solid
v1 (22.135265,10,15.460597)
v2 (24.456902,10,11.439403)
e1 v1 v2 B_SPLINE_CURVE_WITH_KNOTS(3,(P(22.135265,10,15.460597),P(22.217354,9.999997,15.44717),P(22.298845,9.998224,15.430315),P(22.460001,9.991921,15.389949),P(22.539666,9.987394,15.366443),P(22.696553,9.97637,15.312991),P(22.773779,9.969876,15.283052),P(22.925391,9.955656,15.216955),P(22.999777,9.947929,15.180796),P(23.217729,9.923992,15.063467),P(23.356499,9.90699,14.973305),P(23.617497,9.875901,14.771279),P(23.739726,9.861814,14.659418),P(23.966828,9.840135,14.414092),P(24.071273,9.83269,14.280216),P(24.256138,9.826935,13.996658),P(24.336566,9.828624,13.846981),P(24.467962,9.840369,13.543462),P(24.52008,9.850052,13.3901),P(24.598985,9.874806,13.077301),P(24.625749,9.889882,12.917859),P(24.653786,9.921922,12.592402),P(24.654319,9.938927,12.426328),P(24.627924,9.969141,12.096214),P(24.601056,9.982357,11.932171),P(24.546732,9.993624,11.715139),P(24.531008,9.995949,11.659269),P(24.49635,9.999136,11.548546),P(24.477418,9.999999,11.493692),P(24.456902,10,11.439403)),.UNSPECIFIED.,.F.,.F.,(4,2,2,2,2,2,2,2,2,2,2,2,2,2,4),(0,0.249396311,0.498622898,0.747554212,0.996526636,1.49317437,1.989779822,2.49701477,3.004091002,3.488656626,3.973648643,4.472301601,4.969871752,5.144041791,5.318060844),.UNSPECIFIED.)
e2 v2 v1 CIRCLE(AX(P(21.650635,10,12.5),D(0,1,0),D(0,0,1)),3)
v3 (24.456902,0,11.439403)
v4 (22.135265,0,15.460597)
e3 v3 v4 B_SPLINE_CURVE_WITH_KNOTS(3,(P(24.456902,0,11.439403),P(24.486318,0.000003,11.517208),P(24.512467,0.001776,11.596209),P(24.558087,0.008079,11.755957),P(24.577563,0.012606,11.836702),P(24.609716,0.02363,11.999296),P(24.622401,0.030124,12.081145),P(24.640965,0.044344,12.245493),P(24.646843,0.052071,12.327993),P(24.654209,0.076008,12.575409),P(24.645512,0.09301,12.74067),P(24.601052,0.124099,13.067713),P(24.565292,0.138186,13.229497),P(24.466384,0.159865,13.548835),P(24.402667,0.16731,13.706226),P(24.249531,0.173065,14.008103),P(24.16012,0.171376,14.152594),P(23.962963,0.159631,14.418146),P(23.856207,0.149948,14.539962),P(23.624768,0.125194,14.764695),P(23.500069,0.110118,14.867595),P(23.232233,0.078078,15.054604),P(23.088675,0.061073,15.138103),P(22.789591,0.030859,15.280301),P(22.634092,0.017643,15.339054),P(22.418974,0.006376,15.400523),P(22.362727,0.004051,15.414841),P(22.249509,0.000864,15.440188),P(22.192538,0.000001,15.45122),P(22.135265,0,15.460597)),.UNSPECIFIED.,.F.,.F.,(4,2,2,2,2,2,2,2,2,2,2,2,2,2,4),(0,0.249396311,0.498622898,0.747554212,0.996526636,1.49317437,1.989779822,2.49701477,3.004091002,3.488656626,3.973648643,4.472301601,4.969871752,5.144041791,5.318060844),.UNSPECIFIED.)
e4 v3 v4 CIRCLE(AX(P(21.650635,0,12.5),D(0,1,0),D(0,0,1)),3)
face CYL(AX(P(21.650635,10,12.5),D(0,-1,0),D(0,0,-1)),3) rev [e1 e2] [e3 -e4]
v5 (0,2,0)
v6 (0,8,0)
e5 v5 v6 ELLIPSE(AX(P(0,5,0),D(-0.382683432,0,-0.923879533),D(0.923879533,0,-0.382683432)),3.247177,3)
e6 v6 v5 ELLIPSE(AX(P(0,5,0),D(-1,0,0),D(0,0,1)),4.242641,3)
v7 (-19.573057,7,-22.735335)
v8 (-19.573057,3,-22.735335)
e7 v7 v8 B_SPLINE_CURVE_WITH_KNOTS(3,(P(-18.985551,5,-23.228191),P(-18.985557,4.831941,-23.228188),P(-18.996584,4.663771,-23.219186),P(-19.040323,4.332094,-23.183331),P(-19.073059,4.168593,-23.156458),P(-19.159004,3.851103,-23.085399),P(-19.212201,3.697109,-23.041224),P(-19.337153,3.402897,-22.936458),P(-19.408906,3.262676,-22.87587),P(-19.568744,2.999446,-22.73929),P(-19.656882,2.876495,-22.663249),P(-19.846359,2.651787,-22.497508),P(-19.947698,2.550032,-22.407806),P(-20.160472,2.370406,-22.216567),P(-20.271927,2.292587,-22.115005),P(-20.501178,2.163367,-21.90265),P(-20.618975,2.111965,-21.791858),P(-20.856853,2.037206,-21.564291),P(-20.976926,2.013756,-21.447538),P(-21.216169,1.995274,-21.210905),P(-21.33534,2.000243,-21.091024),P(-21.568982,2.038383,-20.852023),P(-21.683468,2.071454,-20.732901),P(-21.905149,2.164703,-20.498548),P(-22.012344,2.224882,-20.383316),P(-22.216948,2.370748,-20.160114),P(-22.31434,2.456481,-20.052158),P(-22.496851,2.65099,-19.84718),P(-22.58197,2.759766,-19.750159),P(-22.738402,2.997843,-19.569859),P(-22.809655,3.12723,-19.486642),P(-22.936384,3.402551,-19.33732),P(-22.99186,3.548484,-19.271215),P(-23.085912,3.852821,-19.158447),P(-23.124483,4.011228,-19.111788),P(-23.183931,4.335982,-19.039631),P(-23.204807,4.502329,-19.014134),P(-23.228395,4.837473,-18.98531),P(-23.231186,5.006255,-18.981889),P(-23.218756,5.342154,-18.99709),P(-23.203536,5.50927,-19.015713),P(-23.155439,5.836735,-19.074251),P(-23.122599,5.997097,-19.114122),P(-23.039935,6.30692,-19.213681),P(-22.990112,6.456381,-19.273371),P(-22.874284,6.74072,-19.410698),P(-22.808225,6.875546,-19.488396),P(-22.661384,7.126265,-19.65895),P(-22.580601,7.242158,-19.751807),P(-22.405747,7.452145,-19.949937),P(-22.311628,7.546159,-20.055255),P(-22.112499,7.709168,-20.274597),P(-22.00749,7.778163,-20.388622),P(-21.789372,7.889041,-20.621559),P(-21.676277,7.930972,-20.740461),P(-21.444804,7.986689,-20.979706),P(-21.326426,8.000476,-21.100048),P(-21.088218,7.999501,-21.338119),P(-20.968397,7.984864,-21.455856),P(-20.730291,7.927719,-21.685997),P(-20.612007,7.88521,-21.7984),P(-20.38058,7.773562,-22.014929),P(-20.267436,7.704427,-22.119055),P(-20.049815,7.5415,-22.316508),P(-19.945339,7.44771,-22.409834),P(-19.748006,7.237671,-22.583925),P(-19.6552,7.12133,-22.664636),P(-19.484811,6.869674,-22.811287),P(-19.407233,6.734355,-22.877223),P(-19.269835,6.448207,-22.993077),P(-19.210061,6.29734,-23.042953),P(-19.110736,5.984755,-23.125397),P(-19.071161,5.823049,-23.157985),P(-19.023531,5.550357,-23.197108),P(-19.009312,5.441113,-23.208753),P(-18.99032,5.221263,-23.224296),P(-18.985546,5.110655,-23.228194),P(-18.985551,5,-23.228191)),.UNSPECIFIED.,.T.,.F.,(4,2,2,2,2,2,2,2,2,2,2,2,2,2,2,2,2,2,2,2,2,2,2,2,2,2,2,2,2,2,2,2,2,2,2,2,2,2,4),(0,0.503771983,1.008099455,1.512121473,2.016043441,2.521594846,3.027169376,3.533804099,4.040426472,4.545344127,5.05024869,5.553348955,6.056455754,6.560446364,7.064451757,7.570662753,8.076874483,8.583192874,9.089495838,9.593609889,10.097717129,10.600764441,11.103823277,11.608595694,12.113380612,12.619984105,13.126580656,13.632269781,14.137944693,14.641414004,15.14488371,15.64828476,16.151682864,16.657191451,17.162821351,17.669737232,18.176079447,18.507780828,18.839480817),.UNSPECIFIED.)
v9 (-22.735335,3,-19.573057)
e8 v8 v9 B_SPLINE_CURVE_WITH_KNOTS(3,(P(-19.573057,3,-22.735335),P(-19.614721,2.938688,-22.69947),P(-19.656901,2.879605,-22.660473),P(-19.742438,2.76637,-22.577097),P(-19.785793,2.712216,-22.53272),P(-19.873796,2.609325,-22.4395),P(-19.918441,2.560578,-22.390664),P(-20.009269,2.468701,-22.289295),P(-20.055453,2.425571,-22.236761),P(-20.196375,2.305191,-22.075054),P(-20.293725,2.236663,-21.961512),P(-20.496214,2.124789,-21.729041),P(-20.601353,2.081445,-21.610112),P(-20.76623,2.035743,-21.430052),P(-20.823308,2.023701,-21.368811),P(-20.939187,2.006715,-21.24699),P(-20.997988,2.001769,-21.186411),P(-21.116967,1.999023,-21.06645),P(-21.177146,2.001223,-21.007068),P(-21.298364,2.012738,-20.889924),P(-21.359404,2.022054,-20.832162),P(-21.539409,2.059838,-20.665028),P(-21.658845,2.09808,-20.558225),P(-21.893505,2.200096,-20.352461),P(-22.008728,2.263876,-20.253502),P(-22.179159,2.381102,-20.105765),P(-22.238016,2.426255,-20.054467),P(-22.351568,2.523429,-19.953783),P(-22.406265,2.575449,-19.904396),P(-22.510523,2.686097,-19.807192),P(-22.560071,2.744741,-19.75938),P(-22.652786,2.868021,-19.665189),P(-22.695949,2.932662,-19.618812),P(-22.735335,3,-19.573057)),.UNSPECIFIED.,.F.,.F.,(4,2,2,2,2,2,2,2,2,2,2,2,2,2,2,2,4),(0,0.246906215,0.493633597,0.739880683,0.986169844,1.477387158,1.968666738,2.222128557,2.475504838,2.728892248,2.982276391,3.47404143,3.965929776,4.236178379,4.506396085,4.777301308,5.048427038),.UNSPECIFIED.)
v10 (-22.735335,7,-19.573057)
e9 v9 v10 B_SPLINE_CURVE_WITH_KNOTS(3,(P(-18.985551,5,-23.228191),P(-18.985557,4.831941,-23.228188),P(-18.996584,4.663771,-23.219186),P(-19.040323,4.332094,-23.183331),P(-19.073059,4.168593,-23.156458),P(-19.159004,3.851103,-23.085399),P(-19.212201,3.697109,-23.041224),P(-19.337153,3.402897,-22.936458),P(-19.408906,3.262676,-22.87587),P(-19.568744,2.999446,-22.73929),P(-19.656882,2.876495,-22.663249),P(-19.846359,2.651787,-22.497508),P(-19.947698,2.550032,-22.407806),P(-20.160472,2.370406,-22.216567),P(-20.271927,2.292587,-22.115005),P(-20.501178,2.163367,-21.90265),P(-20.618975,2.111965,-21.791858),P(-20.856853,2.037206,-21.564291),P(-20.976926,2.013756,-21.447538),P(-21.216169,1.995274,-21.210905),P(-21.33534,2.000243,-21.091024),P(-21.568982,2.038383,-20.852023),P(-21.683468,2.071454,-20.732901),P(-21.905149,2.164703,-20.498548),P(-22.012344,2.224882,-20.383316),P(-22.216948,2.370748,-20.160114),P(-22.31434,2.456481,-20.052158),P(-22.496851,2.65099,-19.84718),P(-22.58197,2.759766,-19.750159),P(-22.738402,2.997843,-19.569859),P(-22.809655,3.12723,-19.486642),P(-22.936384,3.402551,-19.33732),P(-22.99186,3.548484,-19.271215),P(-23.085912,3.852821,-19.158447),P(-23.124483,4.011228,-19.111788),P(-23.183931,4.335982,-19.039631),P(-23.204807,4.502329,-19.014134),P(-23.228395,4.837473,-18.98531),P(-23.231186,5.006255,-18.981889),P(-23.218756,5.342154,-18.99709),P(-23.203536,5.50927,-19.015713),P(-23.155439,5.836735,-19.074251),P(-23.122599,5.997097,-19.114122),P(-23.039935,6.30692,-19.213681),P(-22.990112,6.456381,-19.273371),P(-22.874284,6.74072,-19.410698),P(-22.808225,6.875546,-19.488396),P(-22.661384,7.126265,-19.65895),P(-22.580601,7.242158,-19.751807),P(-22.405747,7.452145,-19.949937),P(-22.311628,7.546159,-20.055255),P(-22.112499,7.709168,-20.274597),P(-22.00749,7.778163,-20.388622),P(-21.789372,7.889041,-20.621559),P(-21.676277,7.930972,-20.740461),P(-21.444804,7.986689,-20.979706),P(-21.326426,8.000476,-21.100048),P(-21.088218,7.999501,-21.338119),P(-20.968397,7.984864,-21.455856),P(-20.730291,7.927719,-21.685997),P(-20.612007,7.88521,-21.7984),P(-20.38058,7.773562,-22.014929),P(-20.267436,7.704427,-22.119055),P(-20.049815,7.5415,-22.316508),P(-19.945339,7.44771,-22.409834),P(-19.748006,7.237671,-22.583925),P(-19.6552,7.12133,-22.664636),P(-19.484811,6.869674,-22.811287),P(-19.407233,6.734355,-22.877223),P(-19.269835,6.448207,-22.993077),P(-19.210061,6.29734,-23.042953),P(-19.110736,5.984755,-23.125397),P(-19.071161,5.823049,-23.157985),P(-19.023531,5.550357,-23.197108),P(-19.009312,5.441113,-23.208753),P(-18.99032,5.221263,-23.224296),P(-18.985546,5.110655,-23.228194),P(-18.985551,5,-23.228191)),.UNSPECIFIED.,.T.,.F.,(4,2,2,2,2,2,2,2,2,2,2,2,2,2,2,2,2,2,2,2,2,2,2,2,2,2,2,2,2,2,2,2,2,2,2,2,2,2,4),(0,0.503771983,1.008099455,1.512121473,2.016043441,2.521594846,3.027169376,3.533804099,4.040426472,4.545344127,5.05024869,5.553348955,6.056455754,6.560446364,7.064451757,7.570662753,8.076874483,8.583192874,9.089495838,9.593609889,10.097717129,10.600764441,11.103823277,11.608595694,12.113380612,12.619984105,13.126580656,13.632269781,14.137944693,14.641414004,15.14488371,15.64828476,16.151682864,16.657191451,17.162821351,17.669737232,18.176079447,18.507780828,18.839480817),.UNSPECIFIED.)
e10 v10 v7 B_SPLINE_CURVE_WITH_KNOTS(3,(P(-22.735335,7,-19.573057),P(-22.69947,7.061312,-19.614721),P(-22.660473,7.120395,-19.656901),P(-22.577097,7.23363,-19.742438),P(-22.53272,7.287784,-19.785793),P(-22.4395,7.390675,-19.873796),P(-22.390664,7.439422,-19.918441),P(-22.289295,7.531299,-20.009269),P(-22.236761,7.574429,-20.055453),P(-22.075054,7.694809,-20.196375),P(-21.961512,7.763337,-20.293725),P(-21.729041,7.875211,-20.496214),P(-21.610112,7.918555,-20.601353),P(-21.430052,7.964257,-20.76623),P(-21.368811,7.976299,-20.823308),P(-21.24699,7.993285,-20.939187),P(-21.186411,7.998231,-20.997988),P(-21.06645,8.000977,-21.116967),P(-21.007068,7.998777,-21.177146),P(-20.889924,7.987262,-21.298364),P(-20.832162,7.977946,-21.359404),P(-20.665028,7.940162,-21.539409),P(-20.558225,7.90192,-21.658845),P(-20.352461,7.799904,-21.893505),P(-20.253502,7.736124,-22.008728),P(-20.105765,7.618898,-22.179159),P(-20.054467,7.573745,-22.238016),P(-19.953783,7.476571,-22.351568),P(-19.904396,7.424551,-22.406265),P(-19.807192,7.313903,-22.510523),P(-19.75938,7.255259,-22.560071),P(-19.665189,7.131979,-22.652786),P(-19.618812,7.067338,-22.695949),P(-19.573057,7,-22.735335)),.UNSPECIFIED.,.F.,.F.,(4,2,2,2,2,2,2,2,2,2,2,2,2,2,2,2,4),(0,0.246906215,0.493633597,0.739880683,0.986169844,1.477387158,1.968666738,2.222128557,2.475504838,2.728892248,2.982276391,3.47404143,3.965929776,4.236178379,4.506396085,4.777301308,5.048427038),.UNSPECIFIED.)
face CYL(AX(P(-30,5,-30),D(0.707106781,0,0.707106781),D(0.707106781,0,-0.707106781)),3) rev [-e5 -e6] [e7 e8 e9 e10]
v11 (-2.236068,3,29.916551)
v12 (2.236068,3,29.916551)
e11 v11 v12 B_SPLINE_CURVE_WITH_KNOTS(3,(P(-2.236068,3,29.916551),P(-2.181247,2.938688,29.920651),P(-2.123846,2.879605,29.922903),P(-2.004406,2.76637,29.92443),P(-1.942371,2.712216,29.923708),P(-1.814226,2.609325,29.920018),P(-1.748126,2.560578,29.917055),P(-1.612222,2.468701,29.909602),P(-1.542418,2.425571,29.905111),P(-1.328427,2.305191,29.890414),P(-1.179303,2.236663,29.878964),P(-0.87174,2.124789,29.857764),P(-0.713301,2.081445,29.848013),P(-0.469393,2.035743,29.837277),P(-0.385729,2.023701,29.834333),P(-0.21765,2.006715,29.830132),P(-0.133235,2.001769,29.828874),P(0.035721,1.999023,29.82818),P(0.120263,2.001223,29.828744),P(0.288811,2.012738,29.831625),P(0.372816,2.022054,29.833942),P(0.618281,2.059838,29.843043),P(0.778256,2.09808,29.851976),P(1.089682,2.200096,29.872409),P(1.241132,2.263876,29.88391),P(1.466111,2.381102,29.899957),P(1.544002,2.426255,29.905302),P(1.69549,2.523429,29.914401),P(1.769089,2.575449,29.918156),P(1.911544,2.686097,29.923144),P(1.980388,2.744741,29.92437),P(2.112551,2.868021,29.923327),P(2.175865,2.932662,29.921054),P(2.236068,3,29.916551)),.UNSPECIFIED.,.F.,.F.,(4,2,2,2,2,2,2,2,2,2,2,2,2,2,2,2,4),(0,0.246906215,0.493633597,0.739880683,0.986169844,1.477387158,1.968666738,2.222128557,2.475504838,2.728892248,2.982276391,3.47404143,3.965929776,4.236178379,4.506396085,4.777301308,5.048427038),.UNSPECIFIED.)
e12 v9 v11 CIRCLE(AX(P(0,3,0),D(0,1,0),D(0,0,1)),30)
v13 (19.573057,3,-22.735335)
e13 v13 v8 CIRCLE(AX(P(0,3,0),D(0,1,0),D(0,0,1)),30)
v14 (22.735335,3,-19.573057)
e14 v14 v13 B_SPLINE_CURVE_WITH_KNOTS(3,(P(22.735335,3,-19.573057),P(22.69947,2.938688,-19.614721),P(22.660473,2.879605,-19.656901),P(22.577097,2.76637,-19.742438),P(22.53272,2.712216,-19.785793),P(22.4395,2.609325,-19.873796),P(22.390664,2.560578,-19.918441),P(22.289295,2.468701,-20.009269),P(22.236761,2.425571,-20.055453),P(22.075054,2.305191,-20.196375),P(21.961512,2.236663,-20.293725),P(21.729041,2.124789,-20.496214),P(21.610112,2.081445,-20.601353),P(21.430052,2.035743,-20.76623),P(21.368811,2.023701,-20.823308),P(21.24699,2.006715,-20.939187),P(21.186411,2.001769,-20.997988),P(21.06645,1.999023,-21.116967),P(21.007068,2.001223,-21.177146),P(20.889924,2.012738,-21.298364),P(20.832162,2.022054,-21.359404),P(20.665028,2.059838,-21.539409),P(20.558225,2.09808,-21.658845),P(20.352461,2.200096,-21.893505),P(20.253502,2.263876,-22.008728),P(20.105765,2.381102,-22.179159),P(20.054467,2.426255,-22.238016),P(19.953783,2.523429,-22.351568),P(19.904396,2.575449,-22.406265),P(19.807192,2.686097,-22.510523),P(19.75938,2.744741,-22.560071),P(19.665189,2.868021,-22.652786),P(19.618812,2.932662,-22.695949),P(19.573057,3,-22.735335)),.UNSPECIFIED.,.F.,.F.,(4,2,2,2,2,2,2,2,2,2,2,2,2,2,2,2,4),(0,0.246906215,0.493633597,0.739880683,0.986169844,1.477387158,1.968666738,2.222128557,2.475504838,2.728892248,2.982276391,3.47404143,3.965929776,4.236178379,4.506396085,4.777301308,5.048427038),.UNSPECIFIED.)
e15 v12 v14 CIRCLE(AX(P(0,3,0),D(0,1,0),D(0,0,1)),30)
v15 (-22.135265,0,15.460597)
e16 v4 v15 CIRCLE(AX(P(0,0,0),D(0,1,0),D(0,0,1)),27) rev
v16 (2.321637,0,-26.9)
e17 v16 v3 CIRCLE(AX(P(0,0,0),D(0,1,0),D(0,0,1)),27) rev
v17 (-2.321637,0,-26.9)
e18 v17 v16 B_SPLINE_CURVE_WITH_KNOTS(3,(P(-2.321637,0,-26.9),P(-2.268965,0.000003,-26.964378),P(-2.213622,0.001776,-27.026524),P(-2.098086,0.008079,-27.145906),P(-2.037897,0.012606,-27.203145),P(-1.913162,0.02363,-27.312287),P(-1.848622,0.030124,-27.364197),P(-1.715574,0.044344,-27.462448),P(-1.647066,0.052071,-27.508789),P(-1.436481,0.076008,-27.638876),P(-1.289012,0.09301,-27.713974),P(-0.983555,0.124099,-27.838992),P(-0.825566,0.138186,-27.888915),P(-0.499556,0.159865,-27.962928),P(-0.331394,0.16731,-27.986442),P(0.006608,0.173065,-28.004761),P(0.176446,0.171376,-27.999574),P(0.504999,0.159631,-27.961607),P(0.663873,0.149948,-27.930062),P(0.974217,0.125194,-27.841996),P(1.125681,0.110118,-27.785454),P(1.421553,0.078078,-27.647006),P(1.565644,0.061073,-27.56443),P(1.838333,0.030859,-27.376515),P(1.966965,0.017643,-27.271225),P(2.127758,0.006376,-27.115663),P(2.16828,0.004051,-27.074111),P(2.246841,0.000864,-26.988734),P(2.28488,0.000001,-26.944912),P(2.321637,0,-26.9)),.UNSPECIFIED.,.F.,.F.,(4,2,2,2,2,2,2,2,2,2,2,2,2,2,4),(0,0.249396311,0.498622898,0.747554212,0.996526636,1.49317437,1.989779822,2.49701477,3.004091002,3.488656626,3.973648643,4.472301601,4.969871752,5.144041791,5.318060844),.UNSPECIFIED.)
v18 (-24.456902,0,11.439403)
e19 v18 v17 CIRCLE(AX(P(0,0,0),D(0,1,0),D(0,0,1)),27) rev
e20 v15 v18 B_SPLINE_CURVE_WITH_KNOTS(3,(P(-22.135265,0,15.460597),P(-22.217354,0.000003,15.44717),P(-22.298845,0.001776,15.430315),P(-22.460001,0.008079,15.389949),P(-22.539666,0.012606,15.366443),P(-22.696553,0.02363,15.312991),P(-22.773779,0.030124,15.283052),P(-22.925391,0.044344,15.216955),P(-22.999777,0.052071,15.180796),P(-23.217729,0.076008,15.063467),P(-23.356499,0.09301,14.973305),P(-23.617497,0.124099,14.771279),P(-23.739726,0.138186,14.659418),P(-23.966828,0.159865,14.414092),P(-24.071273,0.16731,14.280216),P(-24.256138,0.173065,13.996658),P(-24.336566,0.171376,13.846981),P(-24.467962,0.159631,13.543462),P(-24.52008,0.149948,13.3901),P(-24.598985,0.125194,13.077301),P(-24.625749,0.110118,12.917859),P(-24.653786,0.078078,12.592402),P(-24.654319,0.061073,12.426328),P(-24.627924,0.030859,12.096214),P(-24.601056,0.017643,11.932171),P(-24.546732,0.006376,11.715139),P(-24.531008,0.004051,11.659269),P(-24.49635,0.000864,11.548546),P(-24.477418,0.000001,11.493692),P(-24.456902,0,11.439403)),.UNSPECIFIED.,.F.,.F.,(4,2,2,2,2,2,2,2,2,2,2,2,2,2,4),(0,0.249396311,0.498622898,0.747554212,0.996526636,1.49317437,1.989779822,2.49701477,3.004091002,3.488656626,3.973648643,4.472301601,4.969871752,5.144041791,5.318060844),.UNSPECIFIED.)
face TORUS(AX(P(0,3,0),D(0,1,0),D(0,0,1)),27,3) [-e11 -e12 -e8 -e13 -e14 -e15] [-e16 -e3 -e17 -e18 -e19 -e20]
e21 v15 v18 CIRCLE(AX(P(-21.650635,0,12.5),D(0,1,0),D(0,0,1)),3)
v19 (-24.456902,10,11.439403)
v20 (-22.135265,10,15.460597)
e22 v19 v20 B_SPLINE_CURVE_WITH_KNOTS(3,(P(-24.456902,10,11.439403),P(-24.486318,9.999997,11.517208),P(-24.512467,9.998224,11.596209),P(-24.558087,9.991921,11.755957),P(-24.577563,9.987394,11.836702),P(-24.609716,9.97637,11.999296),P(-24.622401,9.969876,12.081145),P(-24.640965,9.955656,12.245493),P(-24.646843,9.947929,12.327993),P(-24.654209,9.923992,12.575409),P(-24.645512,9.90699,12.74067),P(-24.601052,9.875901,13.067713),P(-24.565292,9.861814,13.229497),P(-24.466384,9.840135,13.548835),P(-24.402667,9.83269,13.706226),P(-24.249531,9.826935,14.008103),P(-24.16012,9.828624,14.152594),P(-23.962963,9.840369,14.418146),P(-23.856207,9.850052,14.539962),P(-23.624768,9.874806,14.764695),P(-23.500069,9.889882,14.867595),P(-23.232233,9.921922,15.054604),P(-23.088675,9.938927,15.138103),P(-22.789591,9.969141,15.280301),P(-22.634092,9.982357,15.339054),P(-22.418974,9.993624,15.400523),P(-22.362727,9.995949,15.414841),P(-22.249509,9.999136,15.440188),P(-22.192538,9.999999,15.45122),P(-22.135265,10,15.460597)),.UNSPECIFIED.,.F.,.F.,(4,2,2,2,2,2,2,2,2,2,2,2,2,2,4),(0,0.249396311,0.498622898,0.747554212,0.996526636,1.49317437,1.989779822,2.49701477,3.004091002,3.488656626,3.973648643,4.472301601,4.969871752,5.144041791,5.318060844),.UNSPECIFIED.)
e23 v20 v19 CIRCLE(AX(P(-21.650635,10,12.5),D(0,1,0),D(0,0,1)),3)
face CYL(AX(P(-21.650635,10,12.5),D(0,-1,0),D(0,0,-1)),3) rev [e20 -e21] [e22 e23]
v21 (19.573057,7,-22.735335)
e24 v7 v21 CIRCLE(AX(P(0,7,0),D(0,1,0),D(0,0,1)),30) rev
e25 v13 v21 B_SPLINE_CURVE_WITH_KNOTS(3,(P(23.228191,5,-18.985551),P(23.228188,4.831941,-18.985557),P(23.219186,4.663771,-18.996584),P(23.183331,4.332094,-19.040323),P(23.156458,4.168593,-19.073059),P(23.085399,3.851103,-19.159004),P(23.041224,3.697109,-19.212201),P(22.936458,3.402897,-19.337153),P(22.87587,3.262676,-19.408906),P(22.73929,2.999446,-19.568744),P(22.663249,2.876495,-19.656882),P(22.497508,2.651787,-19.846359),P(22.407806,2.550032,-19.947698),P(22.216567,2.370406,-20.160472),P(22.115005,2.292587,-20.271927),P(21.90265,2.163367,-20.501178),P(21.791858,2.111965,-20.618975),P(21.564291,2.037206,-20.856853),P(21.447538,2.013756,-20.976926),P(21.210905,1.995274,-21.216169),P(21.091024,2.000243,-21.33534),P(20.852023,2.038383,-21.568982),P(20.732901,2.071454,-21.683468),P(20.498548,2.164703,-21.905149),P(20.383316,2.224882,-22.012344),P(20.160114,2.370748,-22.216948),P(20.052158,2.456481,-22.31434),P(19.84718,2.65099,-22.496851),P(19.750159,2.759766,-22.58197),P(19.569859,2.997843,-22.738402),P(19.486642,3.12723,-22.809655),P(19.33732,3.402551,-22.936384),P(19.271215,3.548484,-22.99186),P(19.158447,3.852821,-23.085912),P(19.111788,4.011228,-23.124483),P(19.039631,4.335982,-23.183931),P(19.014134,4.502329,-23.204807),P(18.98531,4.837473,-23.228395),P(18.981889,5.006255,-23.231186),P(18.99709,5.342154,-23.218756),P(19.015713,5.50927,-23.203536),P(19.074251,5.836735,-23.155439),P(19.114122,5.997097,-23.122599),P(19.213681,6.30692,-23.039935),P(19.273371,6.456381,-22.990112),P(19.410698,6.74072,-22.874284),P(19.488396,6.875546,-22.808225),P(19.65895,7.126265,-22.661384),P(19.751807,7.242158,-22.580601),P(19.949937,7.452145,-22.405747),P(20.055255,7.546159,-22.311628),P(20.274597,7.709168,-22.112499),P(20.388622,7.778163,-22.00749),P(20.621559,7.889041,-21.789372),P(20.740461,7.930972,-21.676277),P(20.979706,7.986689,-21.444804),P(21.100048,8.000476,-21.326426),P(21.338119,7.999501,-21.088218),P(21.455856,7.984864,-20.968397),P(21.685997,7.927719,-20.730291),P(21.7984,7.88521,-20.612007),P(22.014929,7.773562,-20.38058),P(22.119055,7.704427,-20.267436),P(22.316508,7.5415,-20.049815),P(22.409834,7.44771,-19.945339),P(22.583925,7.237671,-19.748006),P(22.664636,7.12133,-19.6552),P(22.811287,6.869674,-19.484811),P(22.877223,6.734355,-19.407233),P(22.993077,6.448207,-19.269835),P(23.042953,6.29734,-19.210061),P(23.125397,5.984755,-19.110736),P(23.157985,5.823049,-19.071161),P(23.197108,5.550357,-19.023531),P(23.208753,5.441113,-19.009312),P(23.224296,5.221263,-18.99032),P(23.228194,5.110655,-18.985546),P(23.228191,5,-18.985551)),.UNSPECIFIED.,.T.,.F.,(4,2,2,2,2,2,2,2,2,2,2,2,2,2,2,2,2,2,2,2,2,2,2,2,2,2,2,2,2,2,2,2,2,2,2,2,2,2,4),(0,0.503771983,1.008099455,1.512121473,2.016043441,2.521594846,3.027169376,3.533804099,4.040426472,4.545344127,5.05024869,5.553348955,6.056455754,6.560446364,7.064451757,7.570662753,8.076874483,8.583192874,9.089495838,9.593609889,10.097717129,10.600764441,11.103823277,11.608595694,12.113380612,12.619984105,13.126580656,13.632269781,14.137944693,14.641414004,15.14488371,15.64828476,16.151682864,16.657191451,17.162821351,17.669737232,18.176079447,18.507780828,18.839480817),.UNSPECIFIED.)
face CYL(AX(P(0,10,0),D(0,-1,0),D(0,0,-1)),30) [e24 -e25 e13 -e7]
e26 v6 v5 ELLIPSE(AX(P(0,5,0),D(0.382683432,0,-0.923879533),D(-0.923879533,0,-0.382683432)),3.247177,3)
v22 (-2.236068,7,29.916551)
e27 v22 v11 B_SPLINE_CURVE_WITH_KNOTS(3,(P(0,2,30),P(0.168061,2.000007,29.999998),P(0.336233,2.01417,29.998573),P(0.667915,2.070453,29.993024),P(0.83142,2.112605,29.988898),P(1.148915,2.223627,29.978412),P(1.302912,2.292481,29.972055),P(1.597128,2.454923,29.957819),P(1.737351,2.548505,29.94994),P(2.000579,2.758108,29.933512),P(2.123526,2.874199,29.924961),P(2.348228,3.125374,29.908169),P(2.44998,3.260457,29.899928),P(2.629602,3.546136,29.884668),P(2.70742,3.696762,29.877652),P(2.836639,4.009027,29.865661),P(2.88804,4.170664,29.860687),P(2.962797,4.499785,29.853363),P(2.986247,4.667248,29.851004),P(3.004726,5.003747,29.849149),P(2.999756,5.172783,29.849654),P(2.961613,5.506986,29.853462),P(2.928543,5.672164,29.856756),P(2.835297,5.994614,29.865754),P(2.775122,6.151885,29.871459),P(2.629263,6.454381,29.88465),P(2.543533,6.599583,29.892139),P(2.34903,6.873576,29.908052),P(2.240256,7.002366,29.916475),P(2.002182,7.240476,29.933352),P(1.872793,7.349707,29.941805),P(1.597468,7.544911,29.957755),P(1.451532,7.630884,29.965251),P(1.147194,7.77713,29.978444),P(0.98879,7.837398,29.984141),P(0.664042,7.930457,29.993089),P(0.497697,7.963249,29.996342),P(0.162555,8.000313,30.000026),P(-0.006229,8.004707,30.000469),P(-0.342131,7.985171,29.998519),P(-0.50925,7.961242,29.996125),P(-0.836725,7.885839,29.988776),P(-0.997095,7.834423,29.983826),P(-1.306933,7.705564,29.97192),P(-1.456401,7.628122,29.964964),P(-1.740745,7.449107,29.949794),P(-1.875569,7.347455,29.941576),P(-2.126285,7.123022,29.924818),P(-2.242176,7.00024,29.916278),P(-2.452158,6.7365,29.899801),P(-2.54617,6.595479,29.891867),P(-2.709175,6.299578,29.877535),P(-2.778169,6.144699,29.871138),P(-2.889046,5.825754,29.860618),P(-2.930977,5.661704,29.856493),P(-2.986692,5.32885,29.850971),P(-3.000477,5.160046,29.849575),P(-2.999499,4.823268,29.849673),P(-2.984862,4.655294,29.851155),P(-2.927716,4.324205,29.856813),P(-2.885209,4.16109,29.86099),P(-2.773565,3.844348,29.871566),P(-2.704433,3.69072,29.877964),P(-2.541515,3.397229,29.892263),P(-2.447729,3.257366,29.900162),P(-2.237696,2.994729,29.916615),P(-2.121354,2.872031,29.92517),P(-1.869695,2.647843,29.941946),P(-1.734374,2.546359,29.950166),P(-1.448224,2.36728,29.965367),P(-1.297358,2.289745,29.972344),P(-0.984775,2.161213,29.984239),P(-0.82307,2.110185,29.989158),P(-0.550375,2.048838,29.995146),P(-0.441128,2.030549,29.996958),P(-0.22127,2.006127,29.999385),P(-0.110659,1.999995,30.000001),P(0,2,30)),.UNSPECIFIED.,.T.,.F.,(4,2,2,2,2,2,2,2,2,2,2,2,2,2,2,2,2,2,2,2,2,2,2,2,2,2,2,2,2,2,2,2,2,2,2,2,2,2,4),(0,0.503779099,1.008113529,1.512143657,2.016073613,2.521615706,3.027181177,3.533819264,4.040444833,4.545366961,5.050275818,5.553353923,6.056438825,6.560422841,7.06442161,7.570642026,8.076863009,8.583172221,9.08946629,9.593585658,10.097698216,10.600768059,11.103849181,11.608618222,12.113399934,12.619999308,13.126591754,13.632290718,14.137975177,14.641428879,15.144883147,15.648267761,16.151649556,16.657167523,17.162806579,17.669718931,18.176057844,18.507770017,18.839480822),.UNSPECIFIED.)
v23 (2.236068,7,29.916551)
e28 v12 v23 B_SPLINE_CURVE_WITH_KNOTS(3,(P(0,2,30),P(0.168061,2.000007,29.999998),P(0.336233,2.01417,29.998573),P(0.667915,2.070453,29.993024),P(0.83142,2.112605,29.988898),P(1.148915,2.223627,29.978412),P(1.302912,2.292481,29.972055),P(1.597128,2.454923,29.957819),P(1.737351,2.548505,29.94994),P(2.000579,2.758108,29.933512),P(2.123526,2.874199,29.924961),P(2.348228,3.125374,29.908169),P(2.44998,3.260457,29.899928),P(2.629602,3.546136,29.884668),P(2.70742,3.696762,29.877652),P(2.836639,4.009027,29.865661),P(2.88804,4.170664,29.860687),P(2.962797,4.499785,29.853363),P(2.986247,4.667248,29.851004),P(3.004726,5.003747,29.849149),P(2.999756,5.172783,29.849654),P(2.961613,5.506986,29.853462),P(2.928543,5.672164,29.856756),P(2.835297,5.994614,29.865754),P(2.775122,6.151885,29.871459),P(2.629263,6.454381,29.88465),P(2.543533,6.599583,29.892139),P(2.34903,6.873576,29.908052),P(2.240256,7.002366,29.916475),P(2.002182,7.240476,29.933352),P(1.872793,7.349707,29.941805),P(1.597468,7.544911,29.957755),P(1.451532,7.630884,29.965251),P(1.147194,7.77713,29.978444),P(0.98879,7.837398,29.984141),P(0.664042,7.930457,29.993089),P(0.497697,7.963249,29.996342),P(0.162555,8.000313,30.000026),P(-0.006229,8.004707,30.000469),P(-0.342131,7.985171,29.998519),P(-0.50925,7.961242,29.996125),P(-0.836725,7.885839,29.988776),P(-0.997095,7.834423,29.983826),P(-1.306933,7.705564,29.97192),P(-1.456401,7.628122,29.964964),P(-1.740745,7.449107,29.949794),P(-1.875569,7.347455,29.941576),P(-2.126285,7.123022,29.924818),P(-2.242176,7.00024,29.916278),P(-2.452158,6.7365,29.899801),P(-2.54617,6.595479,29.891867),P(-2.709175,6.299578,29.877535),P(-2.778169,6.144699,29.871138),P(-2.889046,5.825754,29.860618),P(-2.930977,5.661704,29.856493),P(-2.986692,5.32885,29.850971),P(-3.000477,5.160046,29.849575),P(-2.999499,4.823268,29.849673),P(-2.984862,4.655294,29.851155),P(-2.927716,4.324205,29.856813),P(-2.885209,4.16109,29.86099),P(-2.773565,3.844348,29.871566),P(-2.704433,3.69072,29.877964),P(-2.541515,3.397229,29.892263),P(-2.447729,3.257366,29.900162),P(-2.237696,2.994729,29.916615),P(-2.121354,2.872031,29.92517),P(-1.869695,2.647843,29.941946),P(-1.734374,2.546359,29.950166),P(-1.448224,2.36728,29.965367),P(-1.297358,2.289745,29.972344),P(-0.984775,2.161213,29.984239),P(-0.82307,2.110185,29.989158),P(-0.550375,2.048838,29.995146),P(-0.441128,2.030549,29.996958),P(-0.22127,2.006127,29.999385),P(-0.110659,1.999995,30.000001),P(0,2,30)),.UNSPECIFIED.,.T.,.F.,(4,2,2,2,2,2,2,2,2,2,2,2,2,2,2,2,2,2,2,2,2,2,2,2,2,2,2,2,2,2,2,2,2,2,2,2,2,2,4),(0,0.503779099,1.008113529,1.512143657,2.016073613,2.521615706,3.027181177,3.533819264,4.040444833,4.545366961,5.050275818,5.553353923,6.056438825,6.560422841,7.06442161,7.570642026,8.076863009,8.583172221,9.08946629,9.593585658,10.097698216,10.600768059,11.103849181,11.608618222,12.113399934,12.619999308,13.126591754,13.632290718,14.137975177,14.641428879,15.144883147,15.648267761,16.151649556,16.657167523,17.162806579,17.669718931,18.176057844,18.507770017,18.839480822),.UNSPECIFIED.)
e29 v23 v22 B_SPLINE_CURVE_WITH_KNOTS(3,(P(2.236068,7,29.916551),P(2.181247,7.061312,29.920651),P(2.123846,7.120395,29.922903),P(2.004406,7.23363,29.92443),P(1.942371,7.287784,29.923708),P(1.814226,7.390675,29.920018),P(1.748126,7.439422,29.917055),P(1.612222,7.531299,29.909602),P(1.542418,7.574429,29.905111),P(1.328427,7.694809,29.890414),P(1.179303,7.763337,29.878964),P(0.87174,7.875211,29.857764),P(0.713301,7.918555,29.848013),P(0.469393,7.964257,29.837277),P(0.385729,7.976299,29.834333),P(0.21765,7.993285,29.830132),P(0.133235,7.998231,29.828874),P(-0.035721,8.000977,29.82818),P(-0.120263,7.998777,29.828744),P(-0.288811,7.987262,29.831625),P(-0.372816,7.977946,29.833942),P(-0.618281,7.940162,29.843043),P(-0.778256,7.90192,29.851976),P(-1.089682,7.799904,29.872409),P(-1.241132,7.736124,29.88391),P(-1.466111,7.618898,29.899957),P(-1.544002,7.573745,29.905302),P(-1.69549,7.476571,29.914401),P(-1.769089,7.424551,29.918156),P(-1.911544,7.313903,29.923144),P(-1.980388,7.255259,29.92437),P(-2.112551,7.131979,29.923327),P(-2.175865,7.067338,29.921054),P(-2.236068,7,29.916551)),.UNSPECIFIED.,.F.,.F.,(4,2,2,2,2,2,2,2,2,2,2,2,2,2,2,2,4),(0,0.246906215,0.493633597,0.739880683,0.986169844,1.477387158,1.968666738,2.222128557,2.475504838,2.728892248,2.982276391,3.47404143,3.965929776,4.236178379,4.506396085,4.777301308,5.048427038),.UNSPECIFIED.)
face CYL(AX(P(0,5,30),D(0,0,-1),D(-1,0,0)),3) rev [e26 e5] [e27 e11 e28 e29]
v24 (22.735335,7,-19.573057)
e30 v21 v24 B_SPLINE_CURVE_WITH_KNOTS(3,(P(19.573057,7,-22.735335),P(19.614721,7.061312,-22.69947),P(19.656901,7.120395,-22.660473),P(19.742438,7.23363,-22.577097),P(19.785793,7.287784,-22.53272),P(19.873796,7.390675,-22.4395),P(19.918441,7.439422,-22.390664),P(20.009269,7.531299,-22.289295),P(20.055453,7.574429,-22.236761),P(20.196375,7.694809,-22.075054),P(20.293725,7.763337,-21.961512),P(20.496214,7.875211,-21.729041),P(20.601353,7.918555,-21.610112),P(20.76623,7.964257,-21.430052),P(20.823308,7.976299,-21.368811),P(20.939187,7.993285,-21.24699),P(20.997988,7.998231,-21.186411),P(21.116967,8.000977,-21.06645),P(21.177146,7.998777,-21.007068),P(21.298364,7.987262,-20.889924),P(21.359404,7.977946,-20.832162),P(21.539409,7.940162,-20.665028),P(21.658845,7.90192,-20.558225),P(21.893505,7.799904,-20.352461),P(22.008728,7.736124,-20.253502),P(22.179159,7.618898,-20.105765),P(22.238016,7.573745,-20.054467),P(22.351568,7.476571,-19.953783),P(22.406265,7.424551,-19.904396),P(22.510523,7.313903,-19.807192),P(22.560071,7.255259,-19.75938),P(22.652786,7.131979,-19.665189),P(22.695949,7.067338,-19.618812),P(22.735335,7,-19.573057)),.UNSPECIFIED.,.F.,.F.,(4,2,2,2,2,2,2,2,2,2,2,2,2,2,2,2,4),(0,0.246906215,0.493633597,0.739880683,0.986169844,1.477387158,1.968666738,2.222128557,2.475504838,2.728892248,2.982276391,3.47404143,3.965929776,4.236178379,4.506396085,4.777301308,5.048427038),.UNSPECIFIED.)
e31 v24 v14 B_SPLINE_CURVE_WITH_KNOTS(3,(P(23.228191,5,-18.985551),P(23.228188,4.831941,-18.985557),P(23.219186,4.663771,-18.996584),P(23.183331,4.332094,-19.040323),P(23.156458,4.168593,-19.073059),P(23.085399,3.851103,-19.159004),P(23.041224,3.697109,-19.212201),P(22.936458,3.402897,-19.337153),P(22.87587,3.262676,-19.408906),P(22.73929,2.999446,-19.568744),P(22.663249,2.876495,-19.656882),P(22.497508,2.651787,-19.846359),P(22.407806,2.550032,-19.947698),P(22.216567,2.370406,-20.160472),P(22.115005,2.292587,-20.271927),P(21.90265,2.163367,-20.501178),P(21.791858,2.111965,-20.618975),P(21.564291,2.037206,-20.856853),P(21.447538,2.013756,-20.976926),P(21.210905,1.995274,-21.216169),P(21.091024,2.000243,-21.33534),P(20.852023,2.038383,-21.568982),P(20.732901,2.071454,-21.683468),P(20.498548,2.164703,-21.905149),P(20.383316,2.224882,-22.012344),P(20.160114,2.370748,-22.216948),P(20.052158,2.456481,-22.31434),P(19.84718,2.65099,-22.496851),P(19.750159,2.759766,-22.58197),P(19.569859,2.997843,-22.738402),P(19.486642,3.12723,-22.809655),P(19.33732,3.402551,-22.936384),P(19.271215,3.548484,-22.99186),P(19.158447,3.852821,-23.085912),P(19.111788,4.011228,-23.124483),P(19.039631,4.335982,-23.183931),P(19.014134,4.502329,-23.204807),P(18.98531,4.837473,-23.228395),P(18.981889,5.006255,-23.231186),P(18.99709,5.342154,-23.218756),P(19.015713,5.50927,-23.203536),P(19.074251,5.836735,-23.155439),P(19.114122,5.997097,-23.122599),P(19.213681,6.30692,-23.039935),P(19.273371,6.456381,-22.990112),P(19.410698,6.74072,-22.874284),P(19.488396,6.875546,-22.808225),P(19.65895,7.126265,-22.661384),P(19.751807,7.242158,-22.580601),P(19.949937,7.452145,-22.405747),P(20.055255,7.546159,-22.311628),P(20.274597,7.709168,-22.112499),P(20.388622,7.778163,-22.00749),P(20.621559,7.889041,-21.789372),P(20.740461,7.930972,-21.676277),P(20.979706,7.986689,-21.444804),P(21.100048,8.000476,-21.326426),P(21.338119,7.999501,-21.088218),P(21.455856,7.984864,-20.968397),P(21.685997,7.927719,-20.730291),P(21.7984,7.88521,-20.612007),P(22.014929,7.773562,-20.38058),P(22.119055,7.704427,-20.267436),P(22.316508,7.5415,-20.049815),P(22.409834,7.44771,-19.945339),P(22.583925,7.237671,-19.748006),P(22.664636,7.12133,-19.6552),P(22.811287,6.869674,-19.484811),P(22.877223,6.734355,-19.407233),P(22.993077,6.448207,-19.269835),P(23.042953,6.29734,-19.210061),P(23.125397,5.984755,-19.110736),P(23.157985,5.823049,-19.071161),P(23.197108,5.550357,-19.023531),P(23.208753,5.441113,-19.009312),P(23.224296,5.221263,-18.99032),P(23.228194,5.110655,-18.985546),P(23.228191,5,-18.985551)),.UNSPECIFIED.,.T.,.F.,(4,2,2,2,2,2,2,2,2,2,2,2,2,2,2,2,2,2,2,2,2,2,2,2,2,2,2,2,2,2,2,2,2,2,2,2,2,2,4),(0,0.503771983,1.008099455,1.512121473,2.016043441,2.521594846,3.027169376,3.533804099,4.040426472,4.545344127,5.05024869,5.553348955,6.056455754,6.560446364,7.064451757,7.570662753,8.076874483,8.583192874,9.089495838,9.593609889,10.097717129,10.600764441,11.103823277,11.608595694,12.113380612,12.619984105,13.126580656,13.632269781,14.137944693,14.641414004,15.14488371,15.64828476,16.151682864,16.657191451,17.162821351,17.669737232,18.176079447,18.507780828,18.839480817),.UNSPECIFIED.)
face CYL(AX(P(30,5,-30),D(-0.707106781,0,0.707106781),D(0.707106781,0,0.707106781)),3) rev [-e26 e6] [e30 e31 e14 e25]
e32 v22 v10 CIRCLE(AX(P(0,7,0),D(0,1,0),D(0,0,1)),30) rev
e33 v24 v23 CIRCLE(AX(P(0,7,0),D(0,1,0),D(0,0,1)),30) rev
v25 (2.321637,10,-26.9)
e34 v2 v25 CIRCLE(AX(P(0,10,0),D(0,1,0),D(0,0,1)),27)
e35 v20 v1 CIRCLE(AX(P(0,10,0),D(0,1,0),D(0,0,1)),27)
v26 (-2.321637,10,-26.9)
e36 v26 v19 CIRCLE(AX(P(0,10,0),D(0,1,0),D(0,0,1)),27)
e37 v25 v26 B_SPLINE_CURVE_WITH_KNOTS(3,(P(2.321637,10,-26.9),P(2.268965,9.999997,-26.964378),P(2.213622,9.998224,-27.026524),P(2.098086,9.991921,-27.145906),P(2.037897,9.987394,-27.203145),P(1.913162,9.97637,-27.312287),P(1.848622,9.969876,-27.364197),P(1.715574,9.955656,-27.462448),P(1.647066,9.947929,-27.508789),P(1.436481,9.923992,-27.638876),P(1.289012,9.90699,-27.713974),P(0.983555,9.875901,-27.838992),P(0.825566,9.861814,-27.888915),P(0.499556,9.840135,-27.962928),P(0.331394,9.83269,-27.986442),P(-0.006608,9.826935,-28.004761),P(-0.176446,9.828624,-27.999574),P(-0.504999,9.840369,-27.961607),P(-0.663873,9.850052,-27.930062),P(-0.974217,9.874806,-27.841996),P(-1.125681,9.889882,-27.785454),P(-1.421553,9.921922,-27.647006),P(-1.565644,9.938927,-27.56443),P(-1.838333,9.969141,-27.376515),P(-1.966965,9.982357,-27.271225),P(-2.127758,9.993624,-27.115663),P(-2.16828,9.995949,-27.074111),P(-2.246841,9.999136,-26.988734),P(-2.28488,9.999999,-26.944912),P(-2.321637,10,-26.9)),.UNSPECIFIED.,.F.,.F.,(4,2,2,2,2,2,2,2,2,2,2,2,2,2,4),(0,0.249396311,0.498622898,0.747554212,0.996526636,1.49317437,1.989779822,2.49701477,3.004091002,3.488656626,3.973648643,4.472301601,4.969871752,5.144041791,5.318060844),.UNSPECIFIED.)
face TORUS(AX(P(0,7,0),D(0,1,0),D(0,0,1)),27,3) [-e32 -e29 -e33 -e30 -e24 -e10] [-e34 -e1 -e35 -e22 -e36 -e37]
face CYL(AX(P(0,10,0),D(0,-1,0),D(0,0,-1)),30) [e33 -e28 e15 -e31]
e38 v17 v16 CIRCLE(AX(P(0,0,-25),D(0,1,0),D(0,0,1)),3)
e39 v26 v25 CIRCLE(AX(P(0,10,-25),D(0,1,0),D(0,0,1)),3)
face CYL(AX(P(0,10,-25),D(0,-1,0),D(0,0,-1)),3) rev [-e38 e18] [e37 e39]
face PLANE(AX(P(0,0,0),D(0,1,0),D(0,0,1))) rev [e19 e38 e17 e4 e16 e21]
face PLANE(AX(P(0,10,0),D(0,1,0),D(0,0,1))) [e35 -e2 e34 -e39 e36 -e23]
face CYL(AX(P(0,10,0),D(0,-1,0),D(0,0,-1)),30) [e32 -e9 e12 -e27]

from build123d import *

# Parameters (mm, degrees)
SKETCH1_R           = 30
SKETCH1_R_2         = 3
BOSS_EXTRUDE1_DEPTH = 10
SKETCH3_R           = 3
CUT_EXTRUDE1_DEPTH  = 44.588989435
CIRPATTERN1_COUNT   = 8
FILLET1_R           = 3


with BuildPart() as part:
    # Sketch1 → Boss-Extrude1 (new body)
    with BuildSketch(Plane(origin=(0, 0, 0), x_dir=(1, 0, 0), z_dir=(0, 1, 0))):
        with Locations(Location((0, 0, 0), (0, 0, 270))):
            Circle(SKETCH1_R)
        with Locations(Location((0, 25, 0), (0, 0, 270))):
            Circle(SKETCH1_R_2, mode=Mode.SUBTRACT)
        with Locations(Location((21.650635095, -12.5, 0), (0, 0, 270))):
            Circle(SKETCH1_R_2, mode=Mode.SUBTRACT)
        with Locations(Location((-21.650635095, -12.5, 0), (0, 0, 270))):
            Circle(SKETCH1_R_2, mode=Mode.SUBTRACT)
    extrude(amount=BOSS_EXTRUDE1_DEPTH)

    # Sketch3 → Cut-Extrude1 (cut, through all)
    with BuildSketch(Plane.XY):
        with Locations(Location((0, 5, 0), (0, 0, 90))):
            Circle(SKETCH3_R)
    cut_extrude1 = extrude(amount=CUT_EXTRUDE1_DEPTH, mode=Mode.SUBTRACT)

    # CirPattern1: Cut-Extrude1 ×8 about axis, 5 skipped
    cirpattern1_axis = Axis((0, 10, 0), (0, 1, 0))
    add([cut_extrude1.rotate(cirpattern1_axis, i * 360 / CIRPATTERN1_COUNT) for i in range(1, CIRPATTERN1_COUNT) if i not in (1, 2, 4, 6, 7)], mode=Mode.SUBTRACT)

    # Fillet1
    # the kernel refuses this fillet: 3 mm, written as the material it takes off along each edge
    with BuildSketch(Plane(origin=(0, 0, 0), x_dir=(0, 0, 1), z_dir=(-1, 0, 0))) as fillet1_piece_1:
        with BuildLine():
            CenterArc((30 - FILLET1_R, FILLET1_R), FILLET1_R, 270, 90)
            Line((30 - FILLET1_R, 0), (30, 0))
            Line((30, 0), (30, FILLET1_R))
        make_face()
    revolve(axis=Axis((0, 0, 0), (0, 1, 0)), mode=Mode.SUBTRACT)
    with BuildSketch(Plane(origin=(0, 10, 0), x_dir=(0, 0, 1), z_dir=(-1, 0, 0))) as fillet1_piece_2:
        with BuildLine():
            CenterArc((30 - FILLET1_R, -FILLET1_R), FILLET1_R, 0, 90)
            Line((30 - FILLET1_R, 0), (30, 0))
            Line((30, 0), (30, -FILLET1_R))
        make_face()
    revolve(axis=Axis((0, 10, 0), (0, 1, 0)), mode=Mode.SUBTRACT)


solid = part.part
